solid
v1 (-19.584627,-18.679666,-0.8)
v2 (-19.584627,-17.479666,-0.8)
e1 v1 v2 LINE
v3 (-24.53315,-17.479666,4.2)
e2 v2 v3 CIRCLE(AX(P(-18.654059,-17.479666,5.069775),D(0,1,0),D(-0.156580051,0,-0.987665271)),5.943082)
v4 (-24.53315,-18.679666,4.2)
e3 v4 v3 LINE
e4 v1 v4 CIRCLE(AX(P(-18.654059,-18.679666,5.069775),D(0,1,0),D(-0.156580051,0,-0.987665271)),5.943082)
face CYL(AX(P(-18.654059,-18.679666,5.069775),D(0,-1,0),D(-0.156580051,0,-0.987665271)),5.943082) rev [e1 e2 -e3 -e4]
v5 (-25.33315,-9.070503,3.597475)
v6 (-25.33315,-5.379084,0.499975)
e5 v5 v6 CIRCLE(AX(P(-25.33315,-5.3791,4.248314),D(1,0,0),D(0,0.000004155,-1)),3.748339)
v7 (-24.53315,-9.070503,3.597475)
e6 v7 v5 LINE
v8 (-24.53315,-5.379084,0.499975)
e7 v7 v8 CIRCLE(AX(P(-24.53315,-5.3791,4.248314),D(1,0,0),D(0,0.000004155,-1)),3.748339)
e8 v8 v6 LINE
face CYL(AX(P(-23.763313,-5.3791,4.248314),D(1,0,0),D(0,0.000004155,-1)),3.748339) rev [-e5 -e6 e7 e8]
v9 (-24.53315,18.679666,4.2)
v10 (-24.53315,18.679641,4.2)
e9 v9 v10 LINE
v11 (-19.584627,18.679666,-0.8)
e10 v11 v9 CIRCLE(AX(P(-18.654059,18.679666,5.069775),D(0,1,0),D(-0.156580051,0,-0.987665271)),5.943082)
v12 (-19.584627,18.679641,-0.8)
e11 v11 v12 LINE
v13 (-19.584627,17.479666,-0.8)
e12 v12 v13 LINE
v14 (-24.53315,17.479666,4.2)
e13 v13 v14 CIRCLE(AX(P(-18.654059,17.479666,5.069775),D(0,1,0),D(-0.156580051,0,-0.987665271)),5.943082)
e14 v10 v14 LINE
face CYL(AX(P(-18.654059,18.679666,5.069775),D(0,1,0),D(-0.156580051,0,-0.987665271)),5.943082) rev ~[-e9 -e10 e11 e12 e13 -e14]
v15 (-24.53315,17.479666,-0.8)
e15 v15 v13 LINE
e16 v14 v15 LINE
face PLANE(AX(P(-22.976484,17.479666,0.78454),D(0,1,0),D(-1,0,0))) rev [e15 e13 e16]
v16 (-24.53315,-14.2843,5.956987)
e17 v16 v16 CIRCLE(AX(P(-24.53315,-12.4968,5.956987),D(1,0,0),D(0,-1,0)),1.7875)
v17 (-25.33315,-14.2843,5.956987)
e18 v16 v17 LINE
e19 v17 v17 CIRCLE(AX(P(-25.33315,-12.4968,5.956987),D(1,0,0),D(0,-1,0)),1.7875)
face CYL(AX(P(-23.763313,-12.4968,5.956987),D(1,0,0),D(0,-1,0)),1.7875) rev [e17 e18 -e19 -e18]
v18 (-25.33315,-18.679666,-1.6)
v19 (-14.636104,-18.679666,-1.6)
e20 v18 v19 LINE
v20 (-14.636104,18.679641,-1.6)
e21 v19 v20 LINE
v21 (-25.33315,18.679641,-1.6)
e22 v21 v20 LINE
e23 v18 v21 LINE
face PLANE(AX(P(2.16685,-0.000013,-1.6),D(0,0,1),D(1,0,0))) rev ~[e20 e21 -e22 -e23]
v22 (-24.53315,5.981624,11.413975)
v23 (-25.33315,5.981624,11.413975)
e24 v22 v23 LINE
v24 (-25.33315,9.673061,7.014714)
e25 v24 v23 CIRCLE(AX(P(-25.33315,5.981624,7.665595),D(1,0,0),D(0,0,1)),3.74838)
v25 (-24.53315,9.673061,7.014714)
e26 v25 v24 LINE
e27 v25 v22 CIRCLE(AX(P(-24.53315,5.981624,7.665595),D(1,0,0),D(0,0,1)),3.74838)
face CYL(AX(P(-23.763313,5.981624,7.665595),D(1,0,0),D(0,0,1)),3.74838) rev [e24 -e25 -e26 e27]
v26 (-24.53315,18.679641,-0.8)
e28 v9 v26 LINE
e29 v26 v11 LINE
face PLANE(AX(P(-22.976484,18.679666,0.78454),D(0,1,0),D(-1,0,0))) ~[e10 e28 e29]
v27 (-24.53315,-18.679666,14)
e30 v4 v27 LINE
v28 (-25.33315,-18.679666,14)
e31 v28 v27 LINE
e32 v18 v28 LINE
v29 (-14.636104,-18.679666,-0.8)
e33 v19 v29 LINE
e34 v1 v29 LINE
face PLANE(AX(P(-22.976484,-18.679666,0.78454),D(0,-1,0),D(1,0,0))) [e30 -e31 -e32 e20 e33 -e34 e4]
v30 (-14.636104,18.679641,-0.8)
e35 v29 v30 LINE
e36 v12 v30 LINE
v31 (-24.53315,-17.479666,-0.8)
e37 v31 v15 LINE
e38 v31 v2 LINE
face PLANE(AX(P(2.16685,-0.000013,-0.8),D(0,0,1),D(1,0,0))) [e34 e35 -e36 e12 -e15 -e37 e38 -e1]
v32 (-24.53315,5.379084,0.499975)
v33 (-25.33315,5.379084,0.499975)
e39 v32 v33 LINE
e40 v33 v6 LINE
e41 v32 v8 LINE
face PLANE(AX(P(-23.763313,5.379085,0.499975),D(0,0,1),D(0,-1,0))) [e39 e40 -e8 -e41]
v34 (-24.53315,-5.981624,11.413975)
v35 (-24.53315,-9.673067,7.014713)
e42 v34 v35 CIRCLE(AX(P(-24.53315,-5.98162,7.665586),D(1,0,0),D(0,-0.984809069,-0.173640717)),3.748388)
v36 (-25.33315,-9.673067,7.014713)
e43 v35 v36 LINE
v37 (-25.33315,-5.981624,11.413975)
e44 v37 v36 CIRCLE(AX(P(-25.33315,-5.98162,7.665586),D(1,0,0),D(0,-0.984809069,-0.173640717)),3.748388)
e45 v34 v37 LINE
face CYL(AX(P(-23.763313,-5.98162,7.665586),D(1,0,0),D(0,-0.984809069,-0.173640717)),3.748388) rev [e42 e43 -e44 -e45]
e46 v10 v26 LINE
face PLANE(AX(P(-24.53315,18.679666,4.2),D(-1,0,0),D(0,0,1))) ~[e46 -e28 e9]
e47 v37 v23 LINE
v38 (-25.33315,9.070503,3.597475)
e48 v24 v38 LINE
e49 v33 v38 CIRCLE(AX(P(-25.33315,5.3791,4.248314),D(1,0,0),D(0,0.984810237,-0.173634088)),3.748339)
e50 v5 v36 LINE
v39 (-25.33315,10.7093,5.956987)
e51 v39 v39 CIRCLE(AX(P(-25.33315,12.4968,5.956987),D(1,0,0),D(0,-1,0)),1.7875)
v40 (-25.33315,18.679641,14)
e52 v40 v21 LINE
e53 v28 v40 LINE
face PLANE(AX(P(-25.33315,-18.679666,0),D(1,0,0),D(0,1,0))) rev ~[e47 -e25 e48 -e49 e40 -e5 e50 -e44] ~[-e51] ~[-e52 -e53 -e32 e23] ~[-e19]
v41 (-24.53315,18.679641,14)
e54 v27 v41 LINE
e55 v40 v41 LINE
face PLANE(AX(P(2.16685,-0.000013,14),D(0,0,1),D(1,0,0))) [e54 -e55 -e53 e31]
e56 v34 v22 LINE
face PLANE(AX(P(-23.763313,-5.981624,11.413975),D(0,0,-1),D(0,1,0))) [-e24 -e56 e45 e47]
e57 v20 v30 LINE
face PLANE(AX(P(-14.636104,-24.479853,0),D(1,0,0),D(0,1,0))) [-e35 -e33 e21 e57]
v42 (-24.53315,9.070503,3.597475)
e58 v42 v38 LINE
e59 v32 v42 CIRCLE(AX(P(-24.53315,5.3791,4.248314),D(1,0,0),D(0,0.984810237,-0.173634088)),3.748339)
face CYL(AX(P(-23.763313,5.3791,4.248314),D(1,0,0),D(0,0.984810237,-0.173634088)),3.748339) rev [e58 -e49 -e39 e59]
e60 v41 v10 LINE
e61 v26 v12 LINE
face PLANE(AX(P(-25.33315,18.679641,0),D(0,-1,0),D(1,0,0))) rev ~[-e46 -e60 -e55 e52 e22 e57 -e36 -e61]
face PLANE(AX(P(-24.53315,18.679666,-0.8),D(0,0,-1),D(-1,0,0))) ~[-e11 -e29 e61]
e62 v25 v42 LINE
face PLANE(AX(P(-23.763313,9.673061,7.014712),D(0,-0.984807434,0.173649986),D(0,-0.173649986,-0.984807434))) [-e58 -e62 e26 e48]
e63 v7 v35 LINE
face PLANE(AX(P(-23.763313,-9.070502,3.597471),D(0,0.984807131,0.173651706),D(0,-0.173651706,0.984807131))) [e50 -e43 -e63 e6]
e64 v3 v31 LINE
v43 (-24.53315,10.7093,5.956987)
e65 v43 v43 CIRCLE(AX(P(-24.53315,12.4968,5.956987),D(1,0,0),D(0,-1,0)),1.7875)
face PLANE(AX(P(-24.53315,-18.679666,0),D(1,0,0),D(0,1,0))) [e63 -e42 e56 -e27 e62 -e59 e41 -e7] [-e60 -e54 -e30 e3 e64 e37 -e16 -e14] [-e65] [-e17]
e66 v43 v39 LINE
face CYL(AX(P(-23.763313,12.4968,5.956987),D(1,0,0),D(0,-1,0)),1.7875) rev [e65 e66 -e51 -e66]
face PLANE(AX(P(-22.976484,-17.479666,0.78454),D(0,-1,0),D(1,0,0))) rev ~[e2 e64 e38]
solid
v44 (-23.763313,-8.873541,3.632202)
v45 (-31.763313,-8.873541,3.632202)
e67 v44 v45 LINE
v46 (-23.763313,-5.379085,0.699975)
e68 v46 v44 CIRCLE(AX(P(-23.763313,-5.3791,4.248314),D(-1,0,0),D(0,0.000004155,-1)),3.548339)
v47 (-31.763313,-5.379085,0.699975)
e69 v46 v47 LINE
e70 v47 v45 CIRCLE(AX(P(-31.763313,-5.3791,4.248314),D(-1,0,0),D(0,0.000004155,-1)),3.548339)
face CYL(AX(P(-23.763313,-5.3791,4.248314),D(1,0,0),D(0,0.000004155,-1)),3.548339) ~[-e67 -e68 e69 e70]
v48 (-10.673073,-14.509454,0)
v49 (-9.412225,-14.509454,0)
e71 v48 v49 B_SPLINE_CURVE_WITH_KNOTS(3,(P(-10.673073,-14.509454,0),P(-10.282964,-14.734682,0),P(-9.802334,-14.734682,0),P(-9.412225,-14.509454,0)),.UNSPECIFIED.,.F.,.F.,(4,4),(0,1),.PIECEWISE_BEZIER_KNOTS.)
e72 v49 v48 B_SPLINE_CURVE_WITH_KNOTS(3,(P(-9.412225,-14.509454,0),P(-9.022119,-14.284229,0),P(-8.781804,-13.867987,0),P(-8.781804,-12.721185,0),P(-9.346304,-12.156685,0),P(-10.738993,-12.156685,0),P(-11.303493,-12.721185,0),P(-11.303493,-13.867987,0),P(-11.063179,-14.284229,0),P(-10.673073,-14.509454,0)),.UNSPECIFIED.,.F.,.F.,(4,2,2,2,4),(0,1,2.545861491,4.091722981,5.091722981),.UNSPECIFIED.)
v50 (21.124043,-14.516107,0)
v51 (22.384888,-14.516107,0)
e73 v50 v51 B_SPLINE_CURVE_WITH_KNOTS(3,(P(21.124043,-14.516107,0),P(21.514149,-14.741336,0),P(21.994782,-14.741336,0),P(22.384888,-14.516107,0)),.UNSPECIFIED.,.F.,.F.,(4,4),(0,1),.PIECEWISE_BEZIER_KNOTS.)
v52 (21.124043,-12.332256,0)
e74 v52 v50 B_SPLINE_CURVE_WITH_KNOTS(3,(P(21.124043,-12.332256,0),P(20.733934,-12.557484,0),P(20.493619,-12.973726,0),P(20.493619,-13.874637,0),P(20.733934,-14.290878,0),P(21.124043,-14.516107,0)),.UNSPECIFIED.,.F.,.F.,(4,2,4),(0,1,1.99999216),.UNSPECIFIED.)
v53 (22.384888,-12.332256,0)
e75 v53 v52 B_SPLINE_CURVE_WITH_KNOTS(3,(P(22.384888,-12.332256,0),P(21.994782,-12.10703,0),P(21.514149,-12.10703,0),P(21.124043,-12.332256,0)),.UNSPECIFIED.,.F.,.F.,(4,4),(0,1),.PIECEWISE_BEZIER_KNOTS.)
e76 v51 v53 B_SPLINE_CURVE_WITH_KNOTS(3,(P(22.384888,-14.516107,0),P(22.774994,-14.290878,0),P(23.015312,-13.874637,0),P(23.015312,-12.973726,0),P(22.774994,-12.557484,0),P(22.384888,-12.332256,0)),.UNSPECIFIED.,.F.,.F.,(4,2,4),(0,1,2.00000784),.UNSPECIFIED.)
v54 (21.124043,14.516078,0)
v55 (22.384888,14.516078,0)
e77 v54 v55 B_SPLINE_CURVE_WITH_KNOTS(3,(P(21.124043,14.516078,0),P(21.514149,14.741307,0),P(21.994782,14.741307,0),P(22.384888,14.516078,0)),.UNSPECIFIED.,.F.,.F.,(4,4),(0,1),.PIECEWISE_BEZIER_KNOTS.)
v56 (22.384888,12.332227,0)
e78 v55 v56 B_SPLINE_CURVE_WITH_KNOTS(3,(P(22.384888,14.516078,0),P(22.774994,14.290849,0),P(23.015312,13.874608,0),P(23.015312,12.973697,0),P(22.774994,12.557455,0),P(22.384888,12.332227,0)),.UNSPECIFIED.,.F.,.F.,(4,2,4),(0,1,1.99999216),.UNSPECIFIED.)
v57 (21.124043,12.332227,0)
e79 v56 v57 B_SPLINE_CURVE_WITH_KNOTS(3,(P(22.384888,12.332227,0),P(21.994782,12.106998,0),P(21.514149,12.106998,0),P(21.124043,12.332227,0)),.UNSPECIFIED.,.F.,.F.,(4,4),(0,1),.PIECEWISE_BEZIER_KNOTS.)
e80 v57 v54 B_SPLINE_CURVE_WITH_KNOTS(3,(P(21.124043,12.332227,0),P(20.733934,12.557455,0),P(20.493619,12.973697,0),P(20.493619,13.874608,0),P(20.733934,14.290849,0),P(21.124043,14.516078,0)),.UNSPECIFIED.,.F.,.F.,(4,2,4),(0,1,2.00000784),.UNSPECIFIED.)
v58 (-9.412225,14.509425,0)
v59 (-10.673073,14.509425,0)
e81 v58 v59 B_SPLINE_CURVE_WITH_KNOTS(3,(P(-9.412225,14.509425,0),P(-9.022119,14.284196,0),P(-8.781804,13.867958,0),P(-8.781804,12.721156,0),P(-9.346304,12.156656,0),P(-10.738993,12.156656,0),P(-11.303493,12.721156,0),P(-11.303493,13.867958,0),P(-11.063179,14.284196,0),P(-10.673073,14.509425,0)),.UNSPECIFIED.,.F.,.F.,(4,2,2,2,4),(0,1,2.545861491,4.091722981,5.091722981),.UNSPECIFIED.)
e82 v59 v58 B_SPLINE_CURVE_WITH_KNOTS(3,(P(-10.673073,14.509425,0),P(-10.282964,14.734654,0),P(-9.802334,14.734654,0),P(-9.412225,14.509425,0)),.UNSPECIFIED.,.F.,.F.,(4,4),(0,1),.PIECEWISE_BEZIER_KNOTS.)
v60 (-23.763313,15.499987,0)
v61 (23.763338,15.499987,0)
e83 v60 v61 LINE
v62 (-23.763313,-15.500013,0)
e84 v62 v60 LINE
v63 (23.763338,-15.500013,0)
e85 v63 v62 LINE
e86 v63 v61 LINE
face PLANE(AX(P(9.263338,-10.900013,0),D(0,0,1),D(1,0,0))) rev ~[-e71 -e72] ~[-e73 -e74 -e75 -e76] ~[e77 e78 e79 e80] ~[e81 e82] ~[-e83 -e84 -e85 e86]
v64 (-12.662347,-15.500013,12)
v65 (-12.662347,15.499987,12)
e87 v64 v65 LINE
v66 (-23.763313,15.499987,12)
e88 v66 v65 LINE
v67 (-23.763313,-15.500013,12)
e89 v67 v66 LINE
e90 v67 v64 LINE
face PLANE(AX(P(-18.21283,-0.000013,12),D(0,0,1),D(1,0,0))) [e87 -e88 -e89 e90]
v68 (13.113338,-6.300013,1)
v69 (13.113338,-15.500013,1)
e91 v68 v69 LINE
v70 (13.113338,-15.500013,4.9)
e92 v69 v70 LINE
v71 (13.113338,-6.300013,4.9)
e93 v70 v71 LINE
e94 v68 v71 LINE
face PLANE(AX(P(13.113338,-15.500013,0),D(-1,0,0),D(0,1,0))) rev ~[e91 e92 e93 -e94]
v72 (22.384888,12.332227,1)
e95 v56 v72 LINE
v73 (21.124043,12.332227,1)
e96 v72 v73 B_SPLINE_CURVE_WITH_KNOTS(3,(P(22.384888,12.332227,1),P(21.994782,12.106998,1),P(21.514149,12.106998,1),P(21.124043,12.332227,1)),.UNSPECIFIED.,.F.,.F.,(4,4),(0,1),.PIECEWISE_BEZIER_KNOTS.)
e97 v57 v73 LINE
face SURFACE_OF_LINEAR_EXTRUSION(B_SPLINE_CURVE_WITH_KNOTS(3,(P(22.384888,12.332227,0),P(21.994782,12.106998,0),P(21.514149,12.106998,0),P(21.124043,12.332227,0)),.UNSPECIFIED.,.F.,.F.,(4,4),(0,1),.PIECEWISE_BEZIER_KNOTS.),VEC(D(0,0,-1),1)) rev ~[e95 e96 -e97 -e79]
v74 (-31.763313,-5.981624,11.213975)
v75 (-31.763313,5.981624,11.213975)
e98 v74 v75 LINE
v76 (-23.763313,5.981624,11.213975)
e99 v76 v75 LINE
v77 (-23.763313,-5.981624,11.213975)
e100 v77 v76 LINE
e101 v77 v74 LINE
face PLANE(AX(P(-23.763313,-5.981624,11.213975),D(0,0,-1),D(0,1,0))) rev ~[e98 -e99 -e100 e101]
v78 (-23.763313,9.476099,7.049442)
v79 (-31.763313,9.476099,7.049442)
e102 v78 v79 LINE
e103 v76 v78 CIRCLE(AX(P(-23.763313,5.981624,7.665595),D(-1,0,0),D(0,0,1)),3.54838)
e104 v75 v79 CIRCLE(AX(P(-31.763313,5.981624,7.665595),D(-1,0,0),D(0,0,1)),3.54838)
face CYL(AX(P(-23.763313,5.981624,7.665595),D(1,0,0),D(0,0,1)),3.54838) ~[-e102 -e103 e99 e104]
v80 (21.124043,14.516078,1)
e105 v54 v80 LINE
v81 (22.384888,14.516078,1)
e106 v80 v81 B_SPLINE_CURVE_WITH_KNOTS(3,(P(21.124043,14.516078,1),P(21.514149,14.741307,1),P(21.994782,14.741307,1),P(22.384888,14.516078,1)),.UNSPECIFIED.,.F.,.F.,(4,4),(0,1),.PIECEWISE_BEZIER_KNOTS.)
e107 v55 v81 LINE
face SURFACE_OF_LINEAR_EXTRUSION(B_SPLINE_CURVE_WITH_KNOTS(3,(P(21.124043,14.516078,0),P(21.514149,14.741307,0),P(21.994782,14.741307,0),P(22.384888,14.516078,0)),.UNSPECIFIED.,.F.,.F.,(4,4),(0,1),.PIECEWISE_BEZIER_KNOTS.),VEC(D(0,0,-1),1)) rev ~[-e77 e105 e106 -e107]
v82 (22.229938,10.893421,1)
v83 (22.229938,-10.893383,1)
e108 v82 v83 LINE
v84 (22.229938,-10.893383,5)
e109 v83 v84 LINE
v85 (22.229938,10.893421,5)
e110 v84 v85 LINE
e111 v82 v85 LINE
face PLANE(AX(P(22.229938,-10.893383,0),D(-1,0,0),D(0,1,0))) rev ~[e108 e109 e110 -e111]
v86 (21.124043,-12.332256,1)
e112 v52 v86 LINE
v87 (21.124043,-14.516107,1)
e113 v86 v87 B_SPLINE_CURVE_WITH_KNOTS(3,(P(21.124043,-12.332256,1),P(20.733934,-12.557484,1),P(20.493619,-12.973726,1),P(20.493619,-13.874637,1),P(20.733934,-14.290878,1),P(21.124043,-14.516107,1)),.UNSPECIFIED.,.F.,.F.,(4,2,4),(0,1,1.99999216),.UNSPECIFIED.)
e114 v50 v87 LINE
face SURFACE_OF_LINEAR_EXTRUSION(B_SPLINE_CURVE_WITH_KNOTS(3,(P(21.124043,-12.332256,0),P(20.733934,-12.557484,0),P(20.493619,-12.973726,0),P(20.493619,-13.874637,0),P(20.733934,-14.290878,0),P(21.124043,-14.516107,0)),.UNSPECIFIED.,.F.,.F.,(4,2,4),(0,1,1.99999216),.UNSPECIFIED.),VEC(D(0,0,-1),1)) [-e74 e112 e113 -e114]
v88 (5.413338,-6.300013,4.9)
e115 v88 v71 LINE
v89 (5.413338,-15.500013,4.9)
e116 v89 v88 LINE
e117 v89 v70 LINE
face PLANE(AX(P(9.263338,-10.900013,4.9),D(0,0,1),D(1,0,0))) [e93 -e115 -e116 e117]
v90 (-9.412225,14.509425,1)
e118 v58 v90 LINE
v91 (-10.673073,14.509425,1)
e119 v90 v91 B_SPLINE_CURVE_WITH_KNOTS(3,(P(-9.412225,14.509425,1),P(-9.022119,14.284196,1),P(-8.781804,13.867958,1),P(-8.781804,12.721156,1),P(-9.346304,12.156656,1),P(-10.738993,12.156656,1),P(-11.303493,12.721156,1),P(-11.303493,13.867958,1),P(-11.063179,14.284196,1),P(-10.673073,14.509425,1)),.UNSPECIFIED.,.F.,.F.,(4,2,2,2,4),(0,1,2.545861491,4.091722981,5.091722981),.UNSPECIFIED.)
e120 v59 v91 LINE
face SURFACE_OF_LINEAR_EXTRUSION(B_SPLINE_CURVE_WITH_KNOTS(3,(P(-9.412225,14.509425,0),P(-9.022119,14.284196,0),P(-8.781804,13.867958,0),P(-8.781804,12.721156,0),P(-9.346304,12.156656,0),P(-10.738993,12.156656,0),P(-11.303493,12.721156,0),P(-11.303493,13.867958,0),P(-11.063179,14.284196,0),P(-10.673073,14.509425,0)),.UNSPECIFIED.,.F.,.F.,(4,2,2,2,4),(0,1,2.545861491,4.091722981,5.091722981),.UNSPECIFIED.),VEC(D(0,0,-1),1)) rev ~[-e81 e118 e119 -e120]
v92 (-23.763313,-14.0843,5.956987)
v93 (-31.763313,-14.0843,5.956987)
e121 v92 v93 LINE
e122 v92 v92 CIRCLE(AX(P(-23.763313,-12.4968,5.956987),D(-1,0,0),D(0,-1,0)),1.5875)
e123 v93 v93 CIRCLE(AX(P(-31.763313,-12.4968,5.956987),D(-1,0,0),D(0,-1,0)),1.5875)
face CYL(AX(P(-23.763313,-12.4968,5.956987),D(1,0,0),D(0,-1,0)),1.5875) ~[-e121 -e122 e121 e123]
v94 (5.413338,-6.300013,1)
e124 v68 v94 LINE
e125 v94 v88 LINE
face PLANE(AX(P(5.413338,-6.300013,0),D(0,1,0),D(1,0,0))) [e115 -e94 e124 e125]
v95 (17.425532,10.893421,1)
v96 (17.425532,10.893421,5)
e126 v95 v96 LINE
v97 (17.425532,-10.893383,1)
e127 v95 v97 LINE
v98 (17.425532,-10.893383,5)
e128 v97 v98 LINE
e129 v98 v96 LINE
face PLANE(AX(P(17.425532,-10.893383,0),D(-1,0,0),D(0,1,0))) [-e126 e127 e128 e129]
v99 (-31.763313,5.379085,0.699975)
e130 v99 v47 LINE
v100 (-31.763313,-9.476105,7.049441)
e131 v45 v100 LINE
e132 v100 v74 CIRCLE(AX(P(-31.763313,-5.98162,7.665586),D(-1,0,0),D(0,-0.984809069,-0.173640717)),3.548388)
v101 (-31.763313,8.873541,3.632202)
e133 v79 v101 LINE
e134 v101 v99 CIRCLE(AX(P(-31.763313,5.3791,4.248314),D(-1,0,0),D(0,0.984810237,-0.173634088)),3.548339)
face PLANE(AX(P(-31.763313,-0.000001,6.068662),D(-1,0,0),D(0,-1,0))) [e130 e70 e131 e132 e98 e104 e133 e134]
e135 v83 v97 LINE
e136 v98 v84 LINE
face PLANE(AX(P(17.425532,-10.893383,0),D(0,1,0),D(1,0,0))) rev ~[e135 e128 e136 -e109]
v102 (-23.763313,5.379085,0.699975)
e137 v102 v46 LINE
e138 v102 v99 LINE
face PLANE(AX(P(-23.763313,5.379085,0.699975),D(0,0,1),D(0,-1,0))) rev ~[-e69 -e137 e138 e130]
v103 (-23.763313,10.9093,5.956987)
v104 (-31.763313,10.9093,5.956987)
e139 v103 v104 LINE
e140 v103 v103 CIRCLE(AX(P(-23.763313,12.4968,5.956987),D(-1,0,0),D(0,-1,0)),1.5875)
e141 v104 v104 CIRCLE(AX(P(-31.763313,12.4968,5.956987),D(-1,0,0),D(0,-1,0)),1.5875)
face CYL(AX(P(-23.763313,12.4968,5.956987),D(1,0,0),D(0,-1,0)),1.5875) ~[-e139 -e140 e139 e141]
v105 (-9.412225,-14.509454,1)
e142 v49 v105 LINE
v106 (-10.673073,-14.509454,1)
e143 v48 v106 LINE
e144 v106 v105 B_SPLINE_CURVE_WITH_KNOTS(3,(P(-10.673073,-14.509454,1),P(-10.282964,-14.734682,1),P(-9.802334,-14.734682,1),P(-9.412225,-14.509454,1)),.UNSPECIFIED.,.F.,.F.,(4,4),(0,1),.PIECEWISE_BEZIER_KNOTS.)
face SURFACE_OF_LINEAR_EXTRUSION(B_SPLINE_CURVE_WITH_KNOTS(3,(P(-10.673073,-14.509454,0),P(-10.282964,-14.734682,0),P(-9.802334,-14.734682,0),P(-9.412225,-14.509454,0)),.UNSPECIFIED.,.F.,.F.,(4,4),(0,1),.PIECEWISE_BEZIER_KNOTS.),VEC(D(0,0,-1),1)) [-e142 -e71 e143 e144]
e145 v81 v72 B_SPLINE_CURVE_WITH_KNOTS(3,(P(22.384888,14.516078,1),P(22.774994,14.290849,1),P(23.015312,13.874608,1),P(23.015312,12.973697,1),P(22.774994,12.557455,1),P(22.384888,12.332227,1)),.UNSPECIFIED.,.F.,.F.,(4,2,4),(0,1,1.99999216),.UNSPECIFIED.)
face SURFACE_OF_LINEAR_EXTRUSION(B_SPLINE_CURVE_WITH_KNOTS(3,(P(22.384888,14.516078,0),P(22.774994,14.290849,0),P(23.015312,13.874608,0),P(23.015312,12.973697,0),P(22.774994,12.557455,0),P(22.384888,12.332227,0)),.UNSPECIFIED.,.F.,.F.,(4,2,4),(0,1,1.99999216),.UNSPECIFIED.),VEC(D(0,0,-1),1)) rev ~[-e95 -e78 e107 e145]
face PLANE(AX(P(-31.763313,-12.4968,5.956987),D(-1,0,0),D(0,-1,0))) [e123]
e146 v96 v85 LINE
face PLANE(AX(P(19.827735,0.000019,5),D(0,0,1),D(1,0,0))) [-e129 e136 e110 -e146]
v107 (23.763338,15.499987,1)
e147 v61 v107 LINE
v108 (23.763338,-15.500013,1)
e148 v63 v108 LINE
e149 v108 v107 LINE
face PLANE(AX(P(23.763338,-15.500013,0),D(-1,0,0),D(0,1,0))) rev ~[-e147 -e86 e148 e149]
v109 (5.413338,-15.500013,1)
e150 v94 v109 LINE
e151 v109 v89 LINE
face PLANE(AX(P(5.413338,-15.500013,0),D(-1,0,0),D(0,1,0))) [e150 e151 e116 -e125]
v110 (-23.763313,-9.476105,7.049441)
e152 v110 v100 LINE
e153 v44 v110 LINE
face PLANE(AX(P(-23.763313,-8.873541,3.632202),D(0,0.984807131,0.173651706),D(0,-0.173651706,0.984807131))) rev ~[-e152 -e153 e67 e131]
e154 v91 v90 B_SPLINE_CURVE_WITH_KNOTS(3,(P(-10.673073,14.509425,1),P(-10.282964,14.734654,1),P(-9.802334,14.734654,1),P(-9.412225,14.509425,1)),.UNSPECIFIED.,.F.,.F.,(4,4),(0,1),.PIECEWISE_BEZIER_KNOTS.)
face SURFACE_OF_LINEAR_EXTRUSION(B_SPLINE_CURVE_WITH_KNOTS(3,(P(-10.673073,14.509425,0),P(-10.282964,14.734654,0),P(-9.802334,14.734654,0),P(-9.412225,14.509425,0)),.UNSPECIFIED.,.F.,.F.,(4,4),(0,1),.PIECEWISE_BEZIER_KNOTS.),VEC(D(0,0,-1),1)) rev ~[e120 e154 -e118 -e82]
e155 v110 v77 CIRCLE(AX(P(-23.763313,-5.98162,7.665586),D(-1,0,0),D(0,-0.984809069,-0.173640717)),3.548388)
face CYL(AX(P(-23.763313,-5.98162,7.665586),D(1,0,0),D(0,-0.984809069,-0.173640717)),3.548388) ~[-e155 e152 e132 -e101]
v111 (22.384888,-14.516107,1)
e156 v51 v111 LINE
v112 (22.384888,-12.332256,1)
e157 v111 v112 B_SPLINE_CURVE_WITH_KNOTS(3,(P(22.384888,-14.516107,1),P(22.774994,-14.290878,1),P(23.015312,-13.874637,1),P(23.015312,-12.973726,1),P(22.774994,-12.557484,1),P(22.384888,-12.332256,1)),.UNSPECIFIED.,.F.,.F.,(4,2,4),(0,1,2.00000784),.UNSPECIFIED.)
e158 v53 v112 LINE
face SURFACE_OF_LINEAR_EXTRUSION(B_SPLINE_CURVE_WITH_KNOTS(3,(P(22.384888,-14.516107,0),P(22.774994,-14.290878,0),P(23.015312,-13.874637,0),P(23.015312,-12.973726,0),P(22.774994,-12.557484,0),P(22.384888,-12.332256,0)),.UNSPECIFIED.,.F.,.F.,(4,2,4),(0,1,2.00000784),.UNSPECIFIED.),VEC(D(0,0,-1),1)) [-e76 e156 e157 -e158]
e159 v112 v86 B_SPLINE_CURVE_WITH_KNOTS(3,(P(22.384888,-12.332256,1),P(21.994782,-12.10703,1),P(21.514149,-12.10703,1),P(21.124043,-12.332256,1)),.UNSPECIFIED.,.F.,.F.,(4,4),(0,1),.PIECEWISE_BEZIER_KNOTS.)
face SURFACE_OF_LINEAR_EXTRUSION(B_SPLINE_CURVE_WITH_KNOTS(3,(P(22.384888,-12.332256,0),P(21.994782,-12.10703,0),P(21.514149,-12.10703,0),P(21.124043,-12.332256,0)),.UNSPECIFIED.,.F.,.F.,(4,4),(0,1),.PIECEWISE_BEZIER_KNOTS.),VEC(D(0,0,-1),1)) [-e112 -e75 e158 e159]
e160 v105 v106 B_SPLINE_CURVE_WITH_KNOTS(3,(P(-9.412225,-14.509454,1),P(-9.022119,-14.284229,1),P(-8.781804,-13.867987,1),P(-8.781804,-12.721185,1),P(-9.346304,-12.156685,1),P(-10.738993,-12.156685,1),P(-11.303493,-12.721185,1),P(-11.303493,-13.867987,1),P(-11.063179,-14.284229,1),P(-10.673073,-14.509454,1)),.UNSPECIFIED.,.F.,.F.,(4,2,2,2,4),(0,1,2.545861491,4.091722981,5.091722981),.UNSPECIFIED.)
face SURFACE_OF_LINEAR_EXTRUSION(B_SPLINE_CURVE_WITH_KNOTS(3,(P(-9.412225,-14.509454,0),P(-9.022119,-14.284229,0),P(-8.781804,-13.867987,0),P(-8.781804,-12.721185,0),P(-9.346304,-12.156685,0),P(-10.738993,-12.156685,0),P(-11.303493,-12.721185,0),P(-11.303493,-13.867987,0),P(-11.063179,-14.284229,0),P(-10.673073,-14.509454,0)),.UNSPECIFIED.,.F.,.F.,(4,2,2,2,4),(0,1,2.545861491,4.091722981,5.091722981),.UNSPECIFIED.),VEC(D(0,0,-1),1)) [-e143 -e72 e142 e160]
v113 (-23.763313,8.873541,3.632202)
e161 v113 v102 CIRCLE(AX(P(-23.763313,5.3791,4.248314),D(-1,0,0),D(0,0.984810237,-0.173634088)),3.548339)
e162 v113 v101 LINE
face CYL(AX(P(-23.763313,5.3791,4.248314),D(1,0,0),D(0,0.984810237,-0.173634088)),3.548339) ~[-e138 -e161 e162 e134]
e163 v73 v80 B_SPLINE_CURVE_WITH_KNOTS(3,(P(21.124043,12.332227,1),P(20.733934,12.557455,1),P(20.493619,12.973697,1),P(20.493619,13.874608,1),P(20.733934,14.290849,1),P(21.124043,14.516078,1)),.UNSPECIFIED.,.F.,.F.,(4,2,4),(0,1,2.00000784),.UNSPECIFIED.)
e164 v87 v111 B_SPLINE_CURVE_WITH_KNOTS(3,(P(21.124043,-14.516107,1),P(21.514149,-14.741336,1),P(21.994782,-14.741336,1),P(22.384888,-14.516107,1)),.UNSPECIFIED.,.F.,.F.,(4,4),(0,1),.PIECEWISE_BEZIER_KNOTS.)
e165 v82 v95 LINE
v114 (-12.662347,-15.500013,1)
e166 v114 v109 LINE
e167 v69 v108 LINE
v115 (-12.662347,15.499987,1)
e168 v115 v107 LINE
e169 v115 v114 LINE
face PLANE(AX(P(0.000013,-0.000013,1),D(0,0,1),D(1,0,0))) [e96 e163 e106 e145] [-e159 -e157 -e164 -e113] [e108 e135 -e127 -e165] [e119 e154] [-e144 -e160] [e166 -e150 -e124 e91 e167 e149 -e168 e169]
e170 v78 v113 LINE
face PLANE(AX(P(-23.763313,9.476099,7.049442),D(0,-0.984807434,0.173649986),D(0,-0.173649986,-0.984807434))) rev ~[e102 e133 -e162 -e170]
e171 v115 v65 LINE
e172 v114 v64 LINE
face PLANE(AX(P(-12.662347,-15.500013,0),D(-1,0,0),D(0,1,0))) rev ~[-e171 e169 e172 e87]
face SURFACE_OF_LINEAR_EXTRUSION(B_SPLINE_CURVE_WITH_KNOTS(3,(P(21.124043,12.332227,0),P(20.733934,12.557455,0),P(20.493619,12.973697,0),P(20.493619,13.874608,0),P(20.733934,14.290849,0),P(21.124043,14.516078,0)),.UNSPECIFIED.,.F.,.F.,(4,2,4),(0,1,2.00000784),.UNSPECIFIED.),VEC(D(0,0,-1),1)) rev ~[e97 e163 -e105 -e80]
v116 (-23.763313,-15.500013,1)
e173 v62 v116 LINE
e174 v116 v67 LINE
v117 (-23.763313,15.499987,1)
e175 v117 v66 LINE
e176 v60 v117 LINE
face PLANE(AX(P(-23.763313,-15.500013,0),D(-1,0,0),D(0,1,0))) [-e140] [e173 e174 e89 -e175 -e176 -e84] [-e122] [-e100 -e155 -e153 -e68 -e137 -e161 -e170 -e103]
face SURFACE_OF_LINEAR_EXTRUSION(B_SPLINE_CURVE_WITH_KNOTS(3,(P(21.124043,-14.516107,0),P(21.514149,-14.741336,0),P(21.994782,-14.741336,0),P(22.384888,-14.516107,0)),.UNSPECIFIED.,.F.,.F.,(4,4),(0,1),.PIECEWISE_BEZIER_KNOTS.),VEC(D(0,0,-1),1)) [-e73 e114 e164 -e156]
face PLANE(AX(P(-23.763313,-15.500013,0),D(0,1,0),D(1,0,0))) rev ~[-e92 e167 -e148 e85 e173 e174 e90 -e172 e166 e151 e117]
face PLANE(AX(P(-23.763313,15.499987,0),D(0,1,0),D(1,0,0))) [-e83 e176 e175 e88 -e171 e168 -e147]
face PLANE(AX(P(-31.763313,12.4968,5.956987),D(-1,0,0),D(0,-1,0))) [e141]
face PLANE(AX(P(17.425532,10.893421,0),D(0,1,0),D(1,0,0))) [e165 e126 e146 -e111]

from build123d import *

# Parameters (mm, degrees)
F0_W           = 47.5266514695
F0_H           = 31
F1_DEPTH       = 1
F2_W           = 4.8044053313
F2_H           = 21.7868040781
F3_DEPTH       = 5
F4_W           = 11.1009664834
F4_H           = 31
F5_DEPTH       = 12
F7_R           = 1.5875
F8_DEPTH       = 8
F9_W           = 7.7
F9_H           = 9.2
F10_DEPTH      = 4.9
F11_W          = 55
F11_H          = 37.359307176
F12_DEPTH      = 14
F12_DEPTH_BACK = 1.6
F13_T          = -0.8
F14_OFFSET     = 0.2
F15_W          = 48.7006613985
F15_H          = 51.2911211699
F16_DEPTH      = 25
F18_DEPTH      = 1.2


# Not quite as in the source:
# - ends of sketch curves that miss each other by under 0.0002 mm in the source are joined
# - a pattern or mirror of a feature is missing from the dataset's text; its kind, count and spacing are read off the source's solid


with BuildPart() as f1:
    # F0 (on Top) → F1 (new body)
    with BuildSketch(Plane.XY):
        with Locations((1.27e-05, -1.27e-05)):
            Rectangle(F0_W, F0_H)
        with BuildLine():
            add(Edge.make_bspline(
                [(-13.943801891, -11.7896289619), (-13.943801891, -11.298779652), (-14.205665174, -10.8452147748), (-14.6307564405, -10.5997901198)],
                knots=[0, 0, 0, 0, 1, 1, 1, 1], degree=3))
            add(Edge.make_bspline(
                [(-14.6307564405, -12.9794642726), (-14.205665174, -12.7340396176), (-13.943801891, -12.2804782718), (-13.943801891, -11.7896289619)],
                knots=[0, 0, 0, 0, 1, 1, 1, 1], degree=3))
            add(Edge.make_bspline(
                [(-16.0046620081, -12.9794642726), (-15.5795707416, -13.2248889276), (-15.0558441757, -13.2248889276), (-14.6307564405, -12.9794642726)],
                knots=[0, 0, 0, 0, 1, 1, 1, 1], degree=3))
            add(Edge.make_bspline(
                [(-16.6916130263, -11.7896289619), (-16.6916130263, -12.2804782718), (-16.4297497433, -12.7340396176), (-16.0046620081, -12.9794642726)],
                knots=[0, 0, 0, 0, 1, 1, 1, 1], degree=3))
            add(Edge.make_bspline(
                [(-16.0046620081, -10.5997901198), (-16.4297497433, -10.8452147748), (-16.6916130263, -11.298779652), (-16.6916130263, -11.7896289619)],
                knots=[0, 0, 0, 0, 1, 1, 1, 1], degree=3))
            add(Edge.make_bspline(
                [(-14.6307564405, -10.5997901198), (-15.0558441757, -10.3543654648), (-15.5795707416, -10.3543654648), (-16.0046620081, -10.5997901198)],
                knots=[0, 0, 0, 0, 1, 1, 1, 1], degree=3))
        make_face(mode=Mode.SUBTRACT)
        with BuildLine():
            add(Edge.make_bspline(
                [(-8.7818043126, -13.417529872), (-8.7818043126, -12.7211853521), (-9.3463043262, -12.1566853385), (-10.0426488461, -12.1566853385)],
                knots=[0, 0, 0, 0, 1, 1, 1, 1], degree=3))
            add(Edge.make_bspline(
                [(-9.4122248137, -14.5094538185), (-9.0221190439, -14.2842287237), (-8.7818043126, -13.8679871245), (-8.7818043126, -13.417529872)],
                knots=[0, 0, 0, 0, 1, 1, 1, 1], degree=3))
            add(Edge.make_bspline(
                [(-10.6730728785, -14.5094538185), (-10.2829635774, -14.7346824448), (-9.8023341148, -14.7346824448), (-9.4122248137, -14.5094538185)],
                knots=[0, 0, 0, 0, 1, 1, 1, 1], degree=3))
            add(Edge.make_bspline(
                [(-11.3034933795, -13.417529872), (-11.3034933795, -13.8679871245), (-11.0631786482, -14.2842287237), (-10.6730728785, -14.5094538185)],
                knots=[0, 0, 0, 0, 1, 1, 1, 1], degree=3))
            add(Edge.make_bspline(
                [(-10.0426488461, -12.1566853385), (-10.7389933659, -12.1566853385), (-11.3034933795, -12.7211853521), (-11.3034933795, -13.417529872)],
                knots=[0, 0, 0, 0, 1, 1, 1, 1], degree=3))
        make_face(mode=Mode.SUBTRACT)
        with BuildLine():
            add(Edge.make_bspline(
                [(23.0153119985, -13.4241830138), (23.0153119985, -12.9737257612), (22.7749937359, -12.5574841621), (22.3848879661, -12.3322555358)],
                knots=[0, 0, 0, 0, 1, 1, 1, 1], degree=3))
            add(Edge.make_bspline(
                [(22.3848879661, -14.5161069604), (22.7749937359, -14.2908783341), (23.0153119985, -13.8746367349), (23.0153119985, -13.4241830138)],
                knots=[0, 0, 0, 0, 1, 1, 1, 1], degree=3))
            add(Edge.make_bspline(
                [(21.1240434327, -14.5161069604), (21.5141492024, -14.7413355866), (21.9947821964, -14.7413355866), (22.3848879661, -14.5161069604)],
                knots=[0, 0, 0, 0, 1, 1, 1, 1], degree=3))
            add(Edge.make_bspline(
                [(20.4936194003, -13.4241830138), (20.4936194003, -13.8746367349), (20.7339341315, -14.2908783341), (21.1240434327, -14.5161069604)],
                knots=[0, 0, 0, 0, 1, 1, 1, 1], degree=3))
            add(Edge.make_bspline(
                [(21.1240434327, -12.3322555358), (20.7339341315, -12.5574841621), (20.4936194003, -12.9737257612), (20.4936194003, -13.4241830138)],
                knots=[0, 0, 0, 0, 1, 1, 1, 1], degree=3))
            add(Edge.make_bspline(
                [(22.3848879661, -12.3322555358), (21.9947821964, -12.1070304409), (21.5141492024, -12.1070304409), (21.1240434327, -12.3322555358)],
                knots=[0, 0, 0, 0, 1, 1, 1, 1], degree=3))
        make_face(mode=Mode.SUBTRACT)
        with BuildLine():
            add(Edge.make_bspline(
                [(-14.6307564405, 12.9794353412), (-14.205665174, 12.7340106862), (-13.943801891, 12.2804493404), (-13.943801891, 11.7896000305)],
                knots=[0, 0, 0, 0, 1, 1, 1, 1], degree=3))
            add(Edge.make_bspline(
                [(-13.943801891, 11.7896000305), (-13.943801891, 11.2987507206), (-14.205665174, 10.8451858434), (-14.6307564405, 10.5997611884)],
                knots=[0, 0, 0, 0, 1, 1, 1, 1], degree=3))
            add(Edge.make_bspline(
                [(-14.6307564405, 10.5997611884), (-15.0558441757, 10.3543365334), (-15.5795707416, 10.3543365334), (-16.0046620081, 10.5997611884)],
                knots=[0, 0, 0, 0, 1, 1, 1, 1], degree=3))
            add(Edge.make_bspline(
                [(-16.0046620081, 10.5997611884), (-16.4297497433, 10.8451858434), (-16.6916130263, 11.2987507206), (-16.6916130263, 11.7896000305)],
                knots=[0, 0, 0, 0, 1, 1, 1, 1], degree=3))
            add(Edge.make_bspline(
                [(-16.6916130263, 11.7896000305), (-16.6916130263, 12.2804493404), (-16.4297497433, 12.7340106862), (-16.0046620081, 12.9794353412)],
                knots=[0, 0, 0, 0, 1, 1, 1, 1], degree=3))
            add(Edge.make_bspline(
                [(-16.0046620081, 12.9794353412), (-15.5795707416, 13.2248599962), (-15.0558441757, 13.2248599962), (-14.6307564405, 12.9794353412)],
                knots=[0, 0, 0, 0, 1, 1, 1, 1], degree=3))
        make_face(mode=Mode.SUBTRACT)
        with BuildLine():
            add(Edge.make_bspline(
                [(-9.4122248137, 14.5094248872), (-9.0221190439, 14.2841962609), (-8.7818043126, 13.8679581931), (-8.7818043126, 13.4175009406)],
                knots=[0, 0, 0, 0, 1, 1, 1, 1], degree=3))
            add(Edge.make_bspline(
                [(-8.7818043126, 13.4175009406), (-8.7818043126, 12.7211564207), (-9.3463043262, 12.1566564071), (-10.0426488461, 12.1566564071)],
                knots=[0, 0, 0, 0, 1, 1, 1, 1], degree=3))
            add(Edge.make_bspline(
                [(-10.0426488461, 12.1566564071), (-10.7389933659, 12.1566564071), (-11.3034933795, 12.7211564207), (-11.3034933795, 13.4175009406)],
                knots=[0, 0, 0, 0, 1, 1, 1, 1], degree=3))
            add(Edge.make_bspline(
                [(-11.3034933795, 13.4175009406), (-11.3034933795, 13.8679581931), (-11.0631786482, 14.2841962609), (-10.6730728785, 14.5094248872)],
                knots=[0, 0, 0, 0, 1, 1, 1, 1], degree=3))
            add(Edge.make_bspline(
                [(-10.6730728785, 14.5094248872), (-10.2829635774, 14.7346535134), (-9.8023341148, 14.7346535134), (-9.4122248137, 14.5094248872)],
                knots=[0, 0, 0, 0, 1, 1, 1, 1], degree=3))
        make_face(mode=Mode.SUBTRACT)
        with BuildLine():
            add(Edge.make_bspline(
                [(22.3848879661, 14.516078029), (22.7749937359, 14.2908494027), (23.0153119985, 13.8746078036), (23.0153119985, 13.424150551)],
                knots=[0, 0, 0, 0, 1, 1, 1, 1], degree=3))
            add(Edge.make_bspline(
                [(23.0153119985, 13.424150551), (23.0153119985, 12.9736968298), (22.7749937359, 12.5574552307), (22.3848879661, 12.3322266044)],
                knots=[0, 0, 0, 0, 1, 1, 1, 1], degree=3))
            add(Edge.make_bspline(
                [(22.3848879661, 12.3322266044), (21.9947821964, 12.1069979781), (21.5141492024, 12.1069979781), (21.1240434327, 12.3322266044)],
                knots=[0, 0, 0, 0, 1, 1, 1, 1], degree=3))
            add(Edge.make_bspline(
                [(21.1240434327, 12.3322266044), (20.7339341315, 12.5574552307), (20.4936194003, 12.9736968298), (20.4936194003, 13.424150551)],
                knots=[0, 0, 0, 0, 1, 1, 1, 1], degree=3))
            add(Edge.make_bspline(
                [(20.4936194003, 13.424150551), (20.4936194003, 13.8746078036), (20.7339341315, 14.2908494027), (21.1240434327, 14.516078029)],
                knots=[0, 0, 0, 0, 1, 1, 1, 1], degree=3))
            add(Edge.make_bspline(
                [(21.1240434327, 14.516078029), (21.5141492024, 14.7413066552), (21.9947821964, 14.7413066552), (22.3848879661, 14.516078029)],
                knots=[0, 0, 0, 0, 1, 1, 1, 1], degree=3))
        make_face(mode=Mode.SUBTRACT)
    extrude(amount=F1_DEPTH)

    # F2 (on Top) → F3 (join)
    with BuildSketch(Plane.XY):
        with Locations((19.8277348989, 1.90825e-05)):
            Rectangle(F2_W, F2_H)
    extrude(amount=F3_DEPTH)

    # F4 (on Top) → F5 (join)
    with BuildSketch(Plane.XY):
        with Locations((-18.2128297931, -1.27e-05)):
            Rectangle(F4_W, F4_H)
    extrude(amount=F5_DEPTH)

    # F7 (on offset) → F8 (join)
    with BuildSketch(Plane(origin=(-23.7633130348, 0, 0), x_dir=(0, -1, 0), z_dir=(-1, 0, 0))):
        with Locations((-12.4968001619, 5.9569873847)):
            Circle(F7_R)
        with BuildLine():
            Line((8.8735406381, 3.6322015847), (9.4761048381, 7.0494413847))
            ThreePointArc((9.4761048381, 7.0494413847), (8.6998346843, 9.9464561177), (5.9816236381, 11.2139745847))
            Line((5.9816236381, 11.2139745847), (-5.9816239619, 11.2139745847))
            ThreePointArc((-5.9816239619, 11.2139745847), (-8.6998350081, 9.9464561177), (-9.476099195, 7.0494424368))
            Line((-9.476099195, 7.0494424368), (-8.8735409619, 3.6322015847))
            ThreePointArc((-8.8735409619, 3.6322015847), (-7.6599450056, 1.530142321), (-5.3790851619, 0.6999747847))
            Line((-5.3790851619, 0.6999747847), (5.3790848381, 0.6999747847))
            ThreePointArc((5.3790848381, 0.6999747847), (7.6599446818, 1.530142321), (8.8735406381, 3.6322015847))
        make_face()
        with Locations((12.4967998381, 5.9569873847)):
            Circle(F7_R)
    extrude(amount=F8_DEPTH)

    # F9 (on Top) → F10 (join)
    with BuildSketch(Plane.XY):
        with Locations((9.2633384348, -10.9000127)):
            Rectangle(F9_W, F9_H)
    extrude(amount=F10_DEPTH)


with BuildPart() as f12:
    # F11 (on Top) → F12 (new body, two sides)
    with BuildSketch(Plane.XY) as f12_sk:
        with Locations((2.1668501538, -1.27e-05)):
            Rectangle(F11_W, F11_H)
    extrude(amount=F12_DEPTH)
    extrude(f12_sk.sketch, amount=-F12_DEPTH_BACK)

    # F13
    f13_openings = [f12.faces().sort_by_distance(p)[0] for p in [
        (2.16685, -1.3e-05, 14),
        (29.66685, -1.3e-05, 6.2),
        (2.16685, -18.679666, 6.2),
        (2.16685, 18.679641, 6.2),
    ]]
    offset(amount=F13_T, openings=f13_openings)

    # F14: cut F1, made larger all round first
    f14_tool = offset(f1.part, amount=F14_OFFSET, kind=Kind.INTERSECTION, mode=Mode.PRIVATE)
    add(f14_tool, mode=Mode.SUBTRACT)

    # F15 (on Top) → F16 (cut)
    with BuildSketch(Plane.XY):
        with Locations((9.7142267041, 1.1657075956)):
            Rectangle(F15_W, F15_H)
    extrude(amount=-F16_DEPTH, mode=Mode.SUBTRACT)

    # F17 (on face) → F18 (join)
    with BuildSketch(Plane.XZ.offset(18.679666288)):
        with BuildLine():
            ThreePointArc((-19.5846269207, -0.8), (-22.8781403141, 0.8891826079), (-24.5331498462, 4.2))
            Line((-24.5331498462, 4.2), (-24.5331498462, -0.8))
            Line((-24.5331498462, -0.8), (-19.5846269207, -0.8))
        make_face()
    f18 = extrude(amount=-F18_DEPTH)

    # F18_copies: F18 across plane
    add(f18.mirror(Plane.ZX))


solid = Compound([f1.part, f12.part])
